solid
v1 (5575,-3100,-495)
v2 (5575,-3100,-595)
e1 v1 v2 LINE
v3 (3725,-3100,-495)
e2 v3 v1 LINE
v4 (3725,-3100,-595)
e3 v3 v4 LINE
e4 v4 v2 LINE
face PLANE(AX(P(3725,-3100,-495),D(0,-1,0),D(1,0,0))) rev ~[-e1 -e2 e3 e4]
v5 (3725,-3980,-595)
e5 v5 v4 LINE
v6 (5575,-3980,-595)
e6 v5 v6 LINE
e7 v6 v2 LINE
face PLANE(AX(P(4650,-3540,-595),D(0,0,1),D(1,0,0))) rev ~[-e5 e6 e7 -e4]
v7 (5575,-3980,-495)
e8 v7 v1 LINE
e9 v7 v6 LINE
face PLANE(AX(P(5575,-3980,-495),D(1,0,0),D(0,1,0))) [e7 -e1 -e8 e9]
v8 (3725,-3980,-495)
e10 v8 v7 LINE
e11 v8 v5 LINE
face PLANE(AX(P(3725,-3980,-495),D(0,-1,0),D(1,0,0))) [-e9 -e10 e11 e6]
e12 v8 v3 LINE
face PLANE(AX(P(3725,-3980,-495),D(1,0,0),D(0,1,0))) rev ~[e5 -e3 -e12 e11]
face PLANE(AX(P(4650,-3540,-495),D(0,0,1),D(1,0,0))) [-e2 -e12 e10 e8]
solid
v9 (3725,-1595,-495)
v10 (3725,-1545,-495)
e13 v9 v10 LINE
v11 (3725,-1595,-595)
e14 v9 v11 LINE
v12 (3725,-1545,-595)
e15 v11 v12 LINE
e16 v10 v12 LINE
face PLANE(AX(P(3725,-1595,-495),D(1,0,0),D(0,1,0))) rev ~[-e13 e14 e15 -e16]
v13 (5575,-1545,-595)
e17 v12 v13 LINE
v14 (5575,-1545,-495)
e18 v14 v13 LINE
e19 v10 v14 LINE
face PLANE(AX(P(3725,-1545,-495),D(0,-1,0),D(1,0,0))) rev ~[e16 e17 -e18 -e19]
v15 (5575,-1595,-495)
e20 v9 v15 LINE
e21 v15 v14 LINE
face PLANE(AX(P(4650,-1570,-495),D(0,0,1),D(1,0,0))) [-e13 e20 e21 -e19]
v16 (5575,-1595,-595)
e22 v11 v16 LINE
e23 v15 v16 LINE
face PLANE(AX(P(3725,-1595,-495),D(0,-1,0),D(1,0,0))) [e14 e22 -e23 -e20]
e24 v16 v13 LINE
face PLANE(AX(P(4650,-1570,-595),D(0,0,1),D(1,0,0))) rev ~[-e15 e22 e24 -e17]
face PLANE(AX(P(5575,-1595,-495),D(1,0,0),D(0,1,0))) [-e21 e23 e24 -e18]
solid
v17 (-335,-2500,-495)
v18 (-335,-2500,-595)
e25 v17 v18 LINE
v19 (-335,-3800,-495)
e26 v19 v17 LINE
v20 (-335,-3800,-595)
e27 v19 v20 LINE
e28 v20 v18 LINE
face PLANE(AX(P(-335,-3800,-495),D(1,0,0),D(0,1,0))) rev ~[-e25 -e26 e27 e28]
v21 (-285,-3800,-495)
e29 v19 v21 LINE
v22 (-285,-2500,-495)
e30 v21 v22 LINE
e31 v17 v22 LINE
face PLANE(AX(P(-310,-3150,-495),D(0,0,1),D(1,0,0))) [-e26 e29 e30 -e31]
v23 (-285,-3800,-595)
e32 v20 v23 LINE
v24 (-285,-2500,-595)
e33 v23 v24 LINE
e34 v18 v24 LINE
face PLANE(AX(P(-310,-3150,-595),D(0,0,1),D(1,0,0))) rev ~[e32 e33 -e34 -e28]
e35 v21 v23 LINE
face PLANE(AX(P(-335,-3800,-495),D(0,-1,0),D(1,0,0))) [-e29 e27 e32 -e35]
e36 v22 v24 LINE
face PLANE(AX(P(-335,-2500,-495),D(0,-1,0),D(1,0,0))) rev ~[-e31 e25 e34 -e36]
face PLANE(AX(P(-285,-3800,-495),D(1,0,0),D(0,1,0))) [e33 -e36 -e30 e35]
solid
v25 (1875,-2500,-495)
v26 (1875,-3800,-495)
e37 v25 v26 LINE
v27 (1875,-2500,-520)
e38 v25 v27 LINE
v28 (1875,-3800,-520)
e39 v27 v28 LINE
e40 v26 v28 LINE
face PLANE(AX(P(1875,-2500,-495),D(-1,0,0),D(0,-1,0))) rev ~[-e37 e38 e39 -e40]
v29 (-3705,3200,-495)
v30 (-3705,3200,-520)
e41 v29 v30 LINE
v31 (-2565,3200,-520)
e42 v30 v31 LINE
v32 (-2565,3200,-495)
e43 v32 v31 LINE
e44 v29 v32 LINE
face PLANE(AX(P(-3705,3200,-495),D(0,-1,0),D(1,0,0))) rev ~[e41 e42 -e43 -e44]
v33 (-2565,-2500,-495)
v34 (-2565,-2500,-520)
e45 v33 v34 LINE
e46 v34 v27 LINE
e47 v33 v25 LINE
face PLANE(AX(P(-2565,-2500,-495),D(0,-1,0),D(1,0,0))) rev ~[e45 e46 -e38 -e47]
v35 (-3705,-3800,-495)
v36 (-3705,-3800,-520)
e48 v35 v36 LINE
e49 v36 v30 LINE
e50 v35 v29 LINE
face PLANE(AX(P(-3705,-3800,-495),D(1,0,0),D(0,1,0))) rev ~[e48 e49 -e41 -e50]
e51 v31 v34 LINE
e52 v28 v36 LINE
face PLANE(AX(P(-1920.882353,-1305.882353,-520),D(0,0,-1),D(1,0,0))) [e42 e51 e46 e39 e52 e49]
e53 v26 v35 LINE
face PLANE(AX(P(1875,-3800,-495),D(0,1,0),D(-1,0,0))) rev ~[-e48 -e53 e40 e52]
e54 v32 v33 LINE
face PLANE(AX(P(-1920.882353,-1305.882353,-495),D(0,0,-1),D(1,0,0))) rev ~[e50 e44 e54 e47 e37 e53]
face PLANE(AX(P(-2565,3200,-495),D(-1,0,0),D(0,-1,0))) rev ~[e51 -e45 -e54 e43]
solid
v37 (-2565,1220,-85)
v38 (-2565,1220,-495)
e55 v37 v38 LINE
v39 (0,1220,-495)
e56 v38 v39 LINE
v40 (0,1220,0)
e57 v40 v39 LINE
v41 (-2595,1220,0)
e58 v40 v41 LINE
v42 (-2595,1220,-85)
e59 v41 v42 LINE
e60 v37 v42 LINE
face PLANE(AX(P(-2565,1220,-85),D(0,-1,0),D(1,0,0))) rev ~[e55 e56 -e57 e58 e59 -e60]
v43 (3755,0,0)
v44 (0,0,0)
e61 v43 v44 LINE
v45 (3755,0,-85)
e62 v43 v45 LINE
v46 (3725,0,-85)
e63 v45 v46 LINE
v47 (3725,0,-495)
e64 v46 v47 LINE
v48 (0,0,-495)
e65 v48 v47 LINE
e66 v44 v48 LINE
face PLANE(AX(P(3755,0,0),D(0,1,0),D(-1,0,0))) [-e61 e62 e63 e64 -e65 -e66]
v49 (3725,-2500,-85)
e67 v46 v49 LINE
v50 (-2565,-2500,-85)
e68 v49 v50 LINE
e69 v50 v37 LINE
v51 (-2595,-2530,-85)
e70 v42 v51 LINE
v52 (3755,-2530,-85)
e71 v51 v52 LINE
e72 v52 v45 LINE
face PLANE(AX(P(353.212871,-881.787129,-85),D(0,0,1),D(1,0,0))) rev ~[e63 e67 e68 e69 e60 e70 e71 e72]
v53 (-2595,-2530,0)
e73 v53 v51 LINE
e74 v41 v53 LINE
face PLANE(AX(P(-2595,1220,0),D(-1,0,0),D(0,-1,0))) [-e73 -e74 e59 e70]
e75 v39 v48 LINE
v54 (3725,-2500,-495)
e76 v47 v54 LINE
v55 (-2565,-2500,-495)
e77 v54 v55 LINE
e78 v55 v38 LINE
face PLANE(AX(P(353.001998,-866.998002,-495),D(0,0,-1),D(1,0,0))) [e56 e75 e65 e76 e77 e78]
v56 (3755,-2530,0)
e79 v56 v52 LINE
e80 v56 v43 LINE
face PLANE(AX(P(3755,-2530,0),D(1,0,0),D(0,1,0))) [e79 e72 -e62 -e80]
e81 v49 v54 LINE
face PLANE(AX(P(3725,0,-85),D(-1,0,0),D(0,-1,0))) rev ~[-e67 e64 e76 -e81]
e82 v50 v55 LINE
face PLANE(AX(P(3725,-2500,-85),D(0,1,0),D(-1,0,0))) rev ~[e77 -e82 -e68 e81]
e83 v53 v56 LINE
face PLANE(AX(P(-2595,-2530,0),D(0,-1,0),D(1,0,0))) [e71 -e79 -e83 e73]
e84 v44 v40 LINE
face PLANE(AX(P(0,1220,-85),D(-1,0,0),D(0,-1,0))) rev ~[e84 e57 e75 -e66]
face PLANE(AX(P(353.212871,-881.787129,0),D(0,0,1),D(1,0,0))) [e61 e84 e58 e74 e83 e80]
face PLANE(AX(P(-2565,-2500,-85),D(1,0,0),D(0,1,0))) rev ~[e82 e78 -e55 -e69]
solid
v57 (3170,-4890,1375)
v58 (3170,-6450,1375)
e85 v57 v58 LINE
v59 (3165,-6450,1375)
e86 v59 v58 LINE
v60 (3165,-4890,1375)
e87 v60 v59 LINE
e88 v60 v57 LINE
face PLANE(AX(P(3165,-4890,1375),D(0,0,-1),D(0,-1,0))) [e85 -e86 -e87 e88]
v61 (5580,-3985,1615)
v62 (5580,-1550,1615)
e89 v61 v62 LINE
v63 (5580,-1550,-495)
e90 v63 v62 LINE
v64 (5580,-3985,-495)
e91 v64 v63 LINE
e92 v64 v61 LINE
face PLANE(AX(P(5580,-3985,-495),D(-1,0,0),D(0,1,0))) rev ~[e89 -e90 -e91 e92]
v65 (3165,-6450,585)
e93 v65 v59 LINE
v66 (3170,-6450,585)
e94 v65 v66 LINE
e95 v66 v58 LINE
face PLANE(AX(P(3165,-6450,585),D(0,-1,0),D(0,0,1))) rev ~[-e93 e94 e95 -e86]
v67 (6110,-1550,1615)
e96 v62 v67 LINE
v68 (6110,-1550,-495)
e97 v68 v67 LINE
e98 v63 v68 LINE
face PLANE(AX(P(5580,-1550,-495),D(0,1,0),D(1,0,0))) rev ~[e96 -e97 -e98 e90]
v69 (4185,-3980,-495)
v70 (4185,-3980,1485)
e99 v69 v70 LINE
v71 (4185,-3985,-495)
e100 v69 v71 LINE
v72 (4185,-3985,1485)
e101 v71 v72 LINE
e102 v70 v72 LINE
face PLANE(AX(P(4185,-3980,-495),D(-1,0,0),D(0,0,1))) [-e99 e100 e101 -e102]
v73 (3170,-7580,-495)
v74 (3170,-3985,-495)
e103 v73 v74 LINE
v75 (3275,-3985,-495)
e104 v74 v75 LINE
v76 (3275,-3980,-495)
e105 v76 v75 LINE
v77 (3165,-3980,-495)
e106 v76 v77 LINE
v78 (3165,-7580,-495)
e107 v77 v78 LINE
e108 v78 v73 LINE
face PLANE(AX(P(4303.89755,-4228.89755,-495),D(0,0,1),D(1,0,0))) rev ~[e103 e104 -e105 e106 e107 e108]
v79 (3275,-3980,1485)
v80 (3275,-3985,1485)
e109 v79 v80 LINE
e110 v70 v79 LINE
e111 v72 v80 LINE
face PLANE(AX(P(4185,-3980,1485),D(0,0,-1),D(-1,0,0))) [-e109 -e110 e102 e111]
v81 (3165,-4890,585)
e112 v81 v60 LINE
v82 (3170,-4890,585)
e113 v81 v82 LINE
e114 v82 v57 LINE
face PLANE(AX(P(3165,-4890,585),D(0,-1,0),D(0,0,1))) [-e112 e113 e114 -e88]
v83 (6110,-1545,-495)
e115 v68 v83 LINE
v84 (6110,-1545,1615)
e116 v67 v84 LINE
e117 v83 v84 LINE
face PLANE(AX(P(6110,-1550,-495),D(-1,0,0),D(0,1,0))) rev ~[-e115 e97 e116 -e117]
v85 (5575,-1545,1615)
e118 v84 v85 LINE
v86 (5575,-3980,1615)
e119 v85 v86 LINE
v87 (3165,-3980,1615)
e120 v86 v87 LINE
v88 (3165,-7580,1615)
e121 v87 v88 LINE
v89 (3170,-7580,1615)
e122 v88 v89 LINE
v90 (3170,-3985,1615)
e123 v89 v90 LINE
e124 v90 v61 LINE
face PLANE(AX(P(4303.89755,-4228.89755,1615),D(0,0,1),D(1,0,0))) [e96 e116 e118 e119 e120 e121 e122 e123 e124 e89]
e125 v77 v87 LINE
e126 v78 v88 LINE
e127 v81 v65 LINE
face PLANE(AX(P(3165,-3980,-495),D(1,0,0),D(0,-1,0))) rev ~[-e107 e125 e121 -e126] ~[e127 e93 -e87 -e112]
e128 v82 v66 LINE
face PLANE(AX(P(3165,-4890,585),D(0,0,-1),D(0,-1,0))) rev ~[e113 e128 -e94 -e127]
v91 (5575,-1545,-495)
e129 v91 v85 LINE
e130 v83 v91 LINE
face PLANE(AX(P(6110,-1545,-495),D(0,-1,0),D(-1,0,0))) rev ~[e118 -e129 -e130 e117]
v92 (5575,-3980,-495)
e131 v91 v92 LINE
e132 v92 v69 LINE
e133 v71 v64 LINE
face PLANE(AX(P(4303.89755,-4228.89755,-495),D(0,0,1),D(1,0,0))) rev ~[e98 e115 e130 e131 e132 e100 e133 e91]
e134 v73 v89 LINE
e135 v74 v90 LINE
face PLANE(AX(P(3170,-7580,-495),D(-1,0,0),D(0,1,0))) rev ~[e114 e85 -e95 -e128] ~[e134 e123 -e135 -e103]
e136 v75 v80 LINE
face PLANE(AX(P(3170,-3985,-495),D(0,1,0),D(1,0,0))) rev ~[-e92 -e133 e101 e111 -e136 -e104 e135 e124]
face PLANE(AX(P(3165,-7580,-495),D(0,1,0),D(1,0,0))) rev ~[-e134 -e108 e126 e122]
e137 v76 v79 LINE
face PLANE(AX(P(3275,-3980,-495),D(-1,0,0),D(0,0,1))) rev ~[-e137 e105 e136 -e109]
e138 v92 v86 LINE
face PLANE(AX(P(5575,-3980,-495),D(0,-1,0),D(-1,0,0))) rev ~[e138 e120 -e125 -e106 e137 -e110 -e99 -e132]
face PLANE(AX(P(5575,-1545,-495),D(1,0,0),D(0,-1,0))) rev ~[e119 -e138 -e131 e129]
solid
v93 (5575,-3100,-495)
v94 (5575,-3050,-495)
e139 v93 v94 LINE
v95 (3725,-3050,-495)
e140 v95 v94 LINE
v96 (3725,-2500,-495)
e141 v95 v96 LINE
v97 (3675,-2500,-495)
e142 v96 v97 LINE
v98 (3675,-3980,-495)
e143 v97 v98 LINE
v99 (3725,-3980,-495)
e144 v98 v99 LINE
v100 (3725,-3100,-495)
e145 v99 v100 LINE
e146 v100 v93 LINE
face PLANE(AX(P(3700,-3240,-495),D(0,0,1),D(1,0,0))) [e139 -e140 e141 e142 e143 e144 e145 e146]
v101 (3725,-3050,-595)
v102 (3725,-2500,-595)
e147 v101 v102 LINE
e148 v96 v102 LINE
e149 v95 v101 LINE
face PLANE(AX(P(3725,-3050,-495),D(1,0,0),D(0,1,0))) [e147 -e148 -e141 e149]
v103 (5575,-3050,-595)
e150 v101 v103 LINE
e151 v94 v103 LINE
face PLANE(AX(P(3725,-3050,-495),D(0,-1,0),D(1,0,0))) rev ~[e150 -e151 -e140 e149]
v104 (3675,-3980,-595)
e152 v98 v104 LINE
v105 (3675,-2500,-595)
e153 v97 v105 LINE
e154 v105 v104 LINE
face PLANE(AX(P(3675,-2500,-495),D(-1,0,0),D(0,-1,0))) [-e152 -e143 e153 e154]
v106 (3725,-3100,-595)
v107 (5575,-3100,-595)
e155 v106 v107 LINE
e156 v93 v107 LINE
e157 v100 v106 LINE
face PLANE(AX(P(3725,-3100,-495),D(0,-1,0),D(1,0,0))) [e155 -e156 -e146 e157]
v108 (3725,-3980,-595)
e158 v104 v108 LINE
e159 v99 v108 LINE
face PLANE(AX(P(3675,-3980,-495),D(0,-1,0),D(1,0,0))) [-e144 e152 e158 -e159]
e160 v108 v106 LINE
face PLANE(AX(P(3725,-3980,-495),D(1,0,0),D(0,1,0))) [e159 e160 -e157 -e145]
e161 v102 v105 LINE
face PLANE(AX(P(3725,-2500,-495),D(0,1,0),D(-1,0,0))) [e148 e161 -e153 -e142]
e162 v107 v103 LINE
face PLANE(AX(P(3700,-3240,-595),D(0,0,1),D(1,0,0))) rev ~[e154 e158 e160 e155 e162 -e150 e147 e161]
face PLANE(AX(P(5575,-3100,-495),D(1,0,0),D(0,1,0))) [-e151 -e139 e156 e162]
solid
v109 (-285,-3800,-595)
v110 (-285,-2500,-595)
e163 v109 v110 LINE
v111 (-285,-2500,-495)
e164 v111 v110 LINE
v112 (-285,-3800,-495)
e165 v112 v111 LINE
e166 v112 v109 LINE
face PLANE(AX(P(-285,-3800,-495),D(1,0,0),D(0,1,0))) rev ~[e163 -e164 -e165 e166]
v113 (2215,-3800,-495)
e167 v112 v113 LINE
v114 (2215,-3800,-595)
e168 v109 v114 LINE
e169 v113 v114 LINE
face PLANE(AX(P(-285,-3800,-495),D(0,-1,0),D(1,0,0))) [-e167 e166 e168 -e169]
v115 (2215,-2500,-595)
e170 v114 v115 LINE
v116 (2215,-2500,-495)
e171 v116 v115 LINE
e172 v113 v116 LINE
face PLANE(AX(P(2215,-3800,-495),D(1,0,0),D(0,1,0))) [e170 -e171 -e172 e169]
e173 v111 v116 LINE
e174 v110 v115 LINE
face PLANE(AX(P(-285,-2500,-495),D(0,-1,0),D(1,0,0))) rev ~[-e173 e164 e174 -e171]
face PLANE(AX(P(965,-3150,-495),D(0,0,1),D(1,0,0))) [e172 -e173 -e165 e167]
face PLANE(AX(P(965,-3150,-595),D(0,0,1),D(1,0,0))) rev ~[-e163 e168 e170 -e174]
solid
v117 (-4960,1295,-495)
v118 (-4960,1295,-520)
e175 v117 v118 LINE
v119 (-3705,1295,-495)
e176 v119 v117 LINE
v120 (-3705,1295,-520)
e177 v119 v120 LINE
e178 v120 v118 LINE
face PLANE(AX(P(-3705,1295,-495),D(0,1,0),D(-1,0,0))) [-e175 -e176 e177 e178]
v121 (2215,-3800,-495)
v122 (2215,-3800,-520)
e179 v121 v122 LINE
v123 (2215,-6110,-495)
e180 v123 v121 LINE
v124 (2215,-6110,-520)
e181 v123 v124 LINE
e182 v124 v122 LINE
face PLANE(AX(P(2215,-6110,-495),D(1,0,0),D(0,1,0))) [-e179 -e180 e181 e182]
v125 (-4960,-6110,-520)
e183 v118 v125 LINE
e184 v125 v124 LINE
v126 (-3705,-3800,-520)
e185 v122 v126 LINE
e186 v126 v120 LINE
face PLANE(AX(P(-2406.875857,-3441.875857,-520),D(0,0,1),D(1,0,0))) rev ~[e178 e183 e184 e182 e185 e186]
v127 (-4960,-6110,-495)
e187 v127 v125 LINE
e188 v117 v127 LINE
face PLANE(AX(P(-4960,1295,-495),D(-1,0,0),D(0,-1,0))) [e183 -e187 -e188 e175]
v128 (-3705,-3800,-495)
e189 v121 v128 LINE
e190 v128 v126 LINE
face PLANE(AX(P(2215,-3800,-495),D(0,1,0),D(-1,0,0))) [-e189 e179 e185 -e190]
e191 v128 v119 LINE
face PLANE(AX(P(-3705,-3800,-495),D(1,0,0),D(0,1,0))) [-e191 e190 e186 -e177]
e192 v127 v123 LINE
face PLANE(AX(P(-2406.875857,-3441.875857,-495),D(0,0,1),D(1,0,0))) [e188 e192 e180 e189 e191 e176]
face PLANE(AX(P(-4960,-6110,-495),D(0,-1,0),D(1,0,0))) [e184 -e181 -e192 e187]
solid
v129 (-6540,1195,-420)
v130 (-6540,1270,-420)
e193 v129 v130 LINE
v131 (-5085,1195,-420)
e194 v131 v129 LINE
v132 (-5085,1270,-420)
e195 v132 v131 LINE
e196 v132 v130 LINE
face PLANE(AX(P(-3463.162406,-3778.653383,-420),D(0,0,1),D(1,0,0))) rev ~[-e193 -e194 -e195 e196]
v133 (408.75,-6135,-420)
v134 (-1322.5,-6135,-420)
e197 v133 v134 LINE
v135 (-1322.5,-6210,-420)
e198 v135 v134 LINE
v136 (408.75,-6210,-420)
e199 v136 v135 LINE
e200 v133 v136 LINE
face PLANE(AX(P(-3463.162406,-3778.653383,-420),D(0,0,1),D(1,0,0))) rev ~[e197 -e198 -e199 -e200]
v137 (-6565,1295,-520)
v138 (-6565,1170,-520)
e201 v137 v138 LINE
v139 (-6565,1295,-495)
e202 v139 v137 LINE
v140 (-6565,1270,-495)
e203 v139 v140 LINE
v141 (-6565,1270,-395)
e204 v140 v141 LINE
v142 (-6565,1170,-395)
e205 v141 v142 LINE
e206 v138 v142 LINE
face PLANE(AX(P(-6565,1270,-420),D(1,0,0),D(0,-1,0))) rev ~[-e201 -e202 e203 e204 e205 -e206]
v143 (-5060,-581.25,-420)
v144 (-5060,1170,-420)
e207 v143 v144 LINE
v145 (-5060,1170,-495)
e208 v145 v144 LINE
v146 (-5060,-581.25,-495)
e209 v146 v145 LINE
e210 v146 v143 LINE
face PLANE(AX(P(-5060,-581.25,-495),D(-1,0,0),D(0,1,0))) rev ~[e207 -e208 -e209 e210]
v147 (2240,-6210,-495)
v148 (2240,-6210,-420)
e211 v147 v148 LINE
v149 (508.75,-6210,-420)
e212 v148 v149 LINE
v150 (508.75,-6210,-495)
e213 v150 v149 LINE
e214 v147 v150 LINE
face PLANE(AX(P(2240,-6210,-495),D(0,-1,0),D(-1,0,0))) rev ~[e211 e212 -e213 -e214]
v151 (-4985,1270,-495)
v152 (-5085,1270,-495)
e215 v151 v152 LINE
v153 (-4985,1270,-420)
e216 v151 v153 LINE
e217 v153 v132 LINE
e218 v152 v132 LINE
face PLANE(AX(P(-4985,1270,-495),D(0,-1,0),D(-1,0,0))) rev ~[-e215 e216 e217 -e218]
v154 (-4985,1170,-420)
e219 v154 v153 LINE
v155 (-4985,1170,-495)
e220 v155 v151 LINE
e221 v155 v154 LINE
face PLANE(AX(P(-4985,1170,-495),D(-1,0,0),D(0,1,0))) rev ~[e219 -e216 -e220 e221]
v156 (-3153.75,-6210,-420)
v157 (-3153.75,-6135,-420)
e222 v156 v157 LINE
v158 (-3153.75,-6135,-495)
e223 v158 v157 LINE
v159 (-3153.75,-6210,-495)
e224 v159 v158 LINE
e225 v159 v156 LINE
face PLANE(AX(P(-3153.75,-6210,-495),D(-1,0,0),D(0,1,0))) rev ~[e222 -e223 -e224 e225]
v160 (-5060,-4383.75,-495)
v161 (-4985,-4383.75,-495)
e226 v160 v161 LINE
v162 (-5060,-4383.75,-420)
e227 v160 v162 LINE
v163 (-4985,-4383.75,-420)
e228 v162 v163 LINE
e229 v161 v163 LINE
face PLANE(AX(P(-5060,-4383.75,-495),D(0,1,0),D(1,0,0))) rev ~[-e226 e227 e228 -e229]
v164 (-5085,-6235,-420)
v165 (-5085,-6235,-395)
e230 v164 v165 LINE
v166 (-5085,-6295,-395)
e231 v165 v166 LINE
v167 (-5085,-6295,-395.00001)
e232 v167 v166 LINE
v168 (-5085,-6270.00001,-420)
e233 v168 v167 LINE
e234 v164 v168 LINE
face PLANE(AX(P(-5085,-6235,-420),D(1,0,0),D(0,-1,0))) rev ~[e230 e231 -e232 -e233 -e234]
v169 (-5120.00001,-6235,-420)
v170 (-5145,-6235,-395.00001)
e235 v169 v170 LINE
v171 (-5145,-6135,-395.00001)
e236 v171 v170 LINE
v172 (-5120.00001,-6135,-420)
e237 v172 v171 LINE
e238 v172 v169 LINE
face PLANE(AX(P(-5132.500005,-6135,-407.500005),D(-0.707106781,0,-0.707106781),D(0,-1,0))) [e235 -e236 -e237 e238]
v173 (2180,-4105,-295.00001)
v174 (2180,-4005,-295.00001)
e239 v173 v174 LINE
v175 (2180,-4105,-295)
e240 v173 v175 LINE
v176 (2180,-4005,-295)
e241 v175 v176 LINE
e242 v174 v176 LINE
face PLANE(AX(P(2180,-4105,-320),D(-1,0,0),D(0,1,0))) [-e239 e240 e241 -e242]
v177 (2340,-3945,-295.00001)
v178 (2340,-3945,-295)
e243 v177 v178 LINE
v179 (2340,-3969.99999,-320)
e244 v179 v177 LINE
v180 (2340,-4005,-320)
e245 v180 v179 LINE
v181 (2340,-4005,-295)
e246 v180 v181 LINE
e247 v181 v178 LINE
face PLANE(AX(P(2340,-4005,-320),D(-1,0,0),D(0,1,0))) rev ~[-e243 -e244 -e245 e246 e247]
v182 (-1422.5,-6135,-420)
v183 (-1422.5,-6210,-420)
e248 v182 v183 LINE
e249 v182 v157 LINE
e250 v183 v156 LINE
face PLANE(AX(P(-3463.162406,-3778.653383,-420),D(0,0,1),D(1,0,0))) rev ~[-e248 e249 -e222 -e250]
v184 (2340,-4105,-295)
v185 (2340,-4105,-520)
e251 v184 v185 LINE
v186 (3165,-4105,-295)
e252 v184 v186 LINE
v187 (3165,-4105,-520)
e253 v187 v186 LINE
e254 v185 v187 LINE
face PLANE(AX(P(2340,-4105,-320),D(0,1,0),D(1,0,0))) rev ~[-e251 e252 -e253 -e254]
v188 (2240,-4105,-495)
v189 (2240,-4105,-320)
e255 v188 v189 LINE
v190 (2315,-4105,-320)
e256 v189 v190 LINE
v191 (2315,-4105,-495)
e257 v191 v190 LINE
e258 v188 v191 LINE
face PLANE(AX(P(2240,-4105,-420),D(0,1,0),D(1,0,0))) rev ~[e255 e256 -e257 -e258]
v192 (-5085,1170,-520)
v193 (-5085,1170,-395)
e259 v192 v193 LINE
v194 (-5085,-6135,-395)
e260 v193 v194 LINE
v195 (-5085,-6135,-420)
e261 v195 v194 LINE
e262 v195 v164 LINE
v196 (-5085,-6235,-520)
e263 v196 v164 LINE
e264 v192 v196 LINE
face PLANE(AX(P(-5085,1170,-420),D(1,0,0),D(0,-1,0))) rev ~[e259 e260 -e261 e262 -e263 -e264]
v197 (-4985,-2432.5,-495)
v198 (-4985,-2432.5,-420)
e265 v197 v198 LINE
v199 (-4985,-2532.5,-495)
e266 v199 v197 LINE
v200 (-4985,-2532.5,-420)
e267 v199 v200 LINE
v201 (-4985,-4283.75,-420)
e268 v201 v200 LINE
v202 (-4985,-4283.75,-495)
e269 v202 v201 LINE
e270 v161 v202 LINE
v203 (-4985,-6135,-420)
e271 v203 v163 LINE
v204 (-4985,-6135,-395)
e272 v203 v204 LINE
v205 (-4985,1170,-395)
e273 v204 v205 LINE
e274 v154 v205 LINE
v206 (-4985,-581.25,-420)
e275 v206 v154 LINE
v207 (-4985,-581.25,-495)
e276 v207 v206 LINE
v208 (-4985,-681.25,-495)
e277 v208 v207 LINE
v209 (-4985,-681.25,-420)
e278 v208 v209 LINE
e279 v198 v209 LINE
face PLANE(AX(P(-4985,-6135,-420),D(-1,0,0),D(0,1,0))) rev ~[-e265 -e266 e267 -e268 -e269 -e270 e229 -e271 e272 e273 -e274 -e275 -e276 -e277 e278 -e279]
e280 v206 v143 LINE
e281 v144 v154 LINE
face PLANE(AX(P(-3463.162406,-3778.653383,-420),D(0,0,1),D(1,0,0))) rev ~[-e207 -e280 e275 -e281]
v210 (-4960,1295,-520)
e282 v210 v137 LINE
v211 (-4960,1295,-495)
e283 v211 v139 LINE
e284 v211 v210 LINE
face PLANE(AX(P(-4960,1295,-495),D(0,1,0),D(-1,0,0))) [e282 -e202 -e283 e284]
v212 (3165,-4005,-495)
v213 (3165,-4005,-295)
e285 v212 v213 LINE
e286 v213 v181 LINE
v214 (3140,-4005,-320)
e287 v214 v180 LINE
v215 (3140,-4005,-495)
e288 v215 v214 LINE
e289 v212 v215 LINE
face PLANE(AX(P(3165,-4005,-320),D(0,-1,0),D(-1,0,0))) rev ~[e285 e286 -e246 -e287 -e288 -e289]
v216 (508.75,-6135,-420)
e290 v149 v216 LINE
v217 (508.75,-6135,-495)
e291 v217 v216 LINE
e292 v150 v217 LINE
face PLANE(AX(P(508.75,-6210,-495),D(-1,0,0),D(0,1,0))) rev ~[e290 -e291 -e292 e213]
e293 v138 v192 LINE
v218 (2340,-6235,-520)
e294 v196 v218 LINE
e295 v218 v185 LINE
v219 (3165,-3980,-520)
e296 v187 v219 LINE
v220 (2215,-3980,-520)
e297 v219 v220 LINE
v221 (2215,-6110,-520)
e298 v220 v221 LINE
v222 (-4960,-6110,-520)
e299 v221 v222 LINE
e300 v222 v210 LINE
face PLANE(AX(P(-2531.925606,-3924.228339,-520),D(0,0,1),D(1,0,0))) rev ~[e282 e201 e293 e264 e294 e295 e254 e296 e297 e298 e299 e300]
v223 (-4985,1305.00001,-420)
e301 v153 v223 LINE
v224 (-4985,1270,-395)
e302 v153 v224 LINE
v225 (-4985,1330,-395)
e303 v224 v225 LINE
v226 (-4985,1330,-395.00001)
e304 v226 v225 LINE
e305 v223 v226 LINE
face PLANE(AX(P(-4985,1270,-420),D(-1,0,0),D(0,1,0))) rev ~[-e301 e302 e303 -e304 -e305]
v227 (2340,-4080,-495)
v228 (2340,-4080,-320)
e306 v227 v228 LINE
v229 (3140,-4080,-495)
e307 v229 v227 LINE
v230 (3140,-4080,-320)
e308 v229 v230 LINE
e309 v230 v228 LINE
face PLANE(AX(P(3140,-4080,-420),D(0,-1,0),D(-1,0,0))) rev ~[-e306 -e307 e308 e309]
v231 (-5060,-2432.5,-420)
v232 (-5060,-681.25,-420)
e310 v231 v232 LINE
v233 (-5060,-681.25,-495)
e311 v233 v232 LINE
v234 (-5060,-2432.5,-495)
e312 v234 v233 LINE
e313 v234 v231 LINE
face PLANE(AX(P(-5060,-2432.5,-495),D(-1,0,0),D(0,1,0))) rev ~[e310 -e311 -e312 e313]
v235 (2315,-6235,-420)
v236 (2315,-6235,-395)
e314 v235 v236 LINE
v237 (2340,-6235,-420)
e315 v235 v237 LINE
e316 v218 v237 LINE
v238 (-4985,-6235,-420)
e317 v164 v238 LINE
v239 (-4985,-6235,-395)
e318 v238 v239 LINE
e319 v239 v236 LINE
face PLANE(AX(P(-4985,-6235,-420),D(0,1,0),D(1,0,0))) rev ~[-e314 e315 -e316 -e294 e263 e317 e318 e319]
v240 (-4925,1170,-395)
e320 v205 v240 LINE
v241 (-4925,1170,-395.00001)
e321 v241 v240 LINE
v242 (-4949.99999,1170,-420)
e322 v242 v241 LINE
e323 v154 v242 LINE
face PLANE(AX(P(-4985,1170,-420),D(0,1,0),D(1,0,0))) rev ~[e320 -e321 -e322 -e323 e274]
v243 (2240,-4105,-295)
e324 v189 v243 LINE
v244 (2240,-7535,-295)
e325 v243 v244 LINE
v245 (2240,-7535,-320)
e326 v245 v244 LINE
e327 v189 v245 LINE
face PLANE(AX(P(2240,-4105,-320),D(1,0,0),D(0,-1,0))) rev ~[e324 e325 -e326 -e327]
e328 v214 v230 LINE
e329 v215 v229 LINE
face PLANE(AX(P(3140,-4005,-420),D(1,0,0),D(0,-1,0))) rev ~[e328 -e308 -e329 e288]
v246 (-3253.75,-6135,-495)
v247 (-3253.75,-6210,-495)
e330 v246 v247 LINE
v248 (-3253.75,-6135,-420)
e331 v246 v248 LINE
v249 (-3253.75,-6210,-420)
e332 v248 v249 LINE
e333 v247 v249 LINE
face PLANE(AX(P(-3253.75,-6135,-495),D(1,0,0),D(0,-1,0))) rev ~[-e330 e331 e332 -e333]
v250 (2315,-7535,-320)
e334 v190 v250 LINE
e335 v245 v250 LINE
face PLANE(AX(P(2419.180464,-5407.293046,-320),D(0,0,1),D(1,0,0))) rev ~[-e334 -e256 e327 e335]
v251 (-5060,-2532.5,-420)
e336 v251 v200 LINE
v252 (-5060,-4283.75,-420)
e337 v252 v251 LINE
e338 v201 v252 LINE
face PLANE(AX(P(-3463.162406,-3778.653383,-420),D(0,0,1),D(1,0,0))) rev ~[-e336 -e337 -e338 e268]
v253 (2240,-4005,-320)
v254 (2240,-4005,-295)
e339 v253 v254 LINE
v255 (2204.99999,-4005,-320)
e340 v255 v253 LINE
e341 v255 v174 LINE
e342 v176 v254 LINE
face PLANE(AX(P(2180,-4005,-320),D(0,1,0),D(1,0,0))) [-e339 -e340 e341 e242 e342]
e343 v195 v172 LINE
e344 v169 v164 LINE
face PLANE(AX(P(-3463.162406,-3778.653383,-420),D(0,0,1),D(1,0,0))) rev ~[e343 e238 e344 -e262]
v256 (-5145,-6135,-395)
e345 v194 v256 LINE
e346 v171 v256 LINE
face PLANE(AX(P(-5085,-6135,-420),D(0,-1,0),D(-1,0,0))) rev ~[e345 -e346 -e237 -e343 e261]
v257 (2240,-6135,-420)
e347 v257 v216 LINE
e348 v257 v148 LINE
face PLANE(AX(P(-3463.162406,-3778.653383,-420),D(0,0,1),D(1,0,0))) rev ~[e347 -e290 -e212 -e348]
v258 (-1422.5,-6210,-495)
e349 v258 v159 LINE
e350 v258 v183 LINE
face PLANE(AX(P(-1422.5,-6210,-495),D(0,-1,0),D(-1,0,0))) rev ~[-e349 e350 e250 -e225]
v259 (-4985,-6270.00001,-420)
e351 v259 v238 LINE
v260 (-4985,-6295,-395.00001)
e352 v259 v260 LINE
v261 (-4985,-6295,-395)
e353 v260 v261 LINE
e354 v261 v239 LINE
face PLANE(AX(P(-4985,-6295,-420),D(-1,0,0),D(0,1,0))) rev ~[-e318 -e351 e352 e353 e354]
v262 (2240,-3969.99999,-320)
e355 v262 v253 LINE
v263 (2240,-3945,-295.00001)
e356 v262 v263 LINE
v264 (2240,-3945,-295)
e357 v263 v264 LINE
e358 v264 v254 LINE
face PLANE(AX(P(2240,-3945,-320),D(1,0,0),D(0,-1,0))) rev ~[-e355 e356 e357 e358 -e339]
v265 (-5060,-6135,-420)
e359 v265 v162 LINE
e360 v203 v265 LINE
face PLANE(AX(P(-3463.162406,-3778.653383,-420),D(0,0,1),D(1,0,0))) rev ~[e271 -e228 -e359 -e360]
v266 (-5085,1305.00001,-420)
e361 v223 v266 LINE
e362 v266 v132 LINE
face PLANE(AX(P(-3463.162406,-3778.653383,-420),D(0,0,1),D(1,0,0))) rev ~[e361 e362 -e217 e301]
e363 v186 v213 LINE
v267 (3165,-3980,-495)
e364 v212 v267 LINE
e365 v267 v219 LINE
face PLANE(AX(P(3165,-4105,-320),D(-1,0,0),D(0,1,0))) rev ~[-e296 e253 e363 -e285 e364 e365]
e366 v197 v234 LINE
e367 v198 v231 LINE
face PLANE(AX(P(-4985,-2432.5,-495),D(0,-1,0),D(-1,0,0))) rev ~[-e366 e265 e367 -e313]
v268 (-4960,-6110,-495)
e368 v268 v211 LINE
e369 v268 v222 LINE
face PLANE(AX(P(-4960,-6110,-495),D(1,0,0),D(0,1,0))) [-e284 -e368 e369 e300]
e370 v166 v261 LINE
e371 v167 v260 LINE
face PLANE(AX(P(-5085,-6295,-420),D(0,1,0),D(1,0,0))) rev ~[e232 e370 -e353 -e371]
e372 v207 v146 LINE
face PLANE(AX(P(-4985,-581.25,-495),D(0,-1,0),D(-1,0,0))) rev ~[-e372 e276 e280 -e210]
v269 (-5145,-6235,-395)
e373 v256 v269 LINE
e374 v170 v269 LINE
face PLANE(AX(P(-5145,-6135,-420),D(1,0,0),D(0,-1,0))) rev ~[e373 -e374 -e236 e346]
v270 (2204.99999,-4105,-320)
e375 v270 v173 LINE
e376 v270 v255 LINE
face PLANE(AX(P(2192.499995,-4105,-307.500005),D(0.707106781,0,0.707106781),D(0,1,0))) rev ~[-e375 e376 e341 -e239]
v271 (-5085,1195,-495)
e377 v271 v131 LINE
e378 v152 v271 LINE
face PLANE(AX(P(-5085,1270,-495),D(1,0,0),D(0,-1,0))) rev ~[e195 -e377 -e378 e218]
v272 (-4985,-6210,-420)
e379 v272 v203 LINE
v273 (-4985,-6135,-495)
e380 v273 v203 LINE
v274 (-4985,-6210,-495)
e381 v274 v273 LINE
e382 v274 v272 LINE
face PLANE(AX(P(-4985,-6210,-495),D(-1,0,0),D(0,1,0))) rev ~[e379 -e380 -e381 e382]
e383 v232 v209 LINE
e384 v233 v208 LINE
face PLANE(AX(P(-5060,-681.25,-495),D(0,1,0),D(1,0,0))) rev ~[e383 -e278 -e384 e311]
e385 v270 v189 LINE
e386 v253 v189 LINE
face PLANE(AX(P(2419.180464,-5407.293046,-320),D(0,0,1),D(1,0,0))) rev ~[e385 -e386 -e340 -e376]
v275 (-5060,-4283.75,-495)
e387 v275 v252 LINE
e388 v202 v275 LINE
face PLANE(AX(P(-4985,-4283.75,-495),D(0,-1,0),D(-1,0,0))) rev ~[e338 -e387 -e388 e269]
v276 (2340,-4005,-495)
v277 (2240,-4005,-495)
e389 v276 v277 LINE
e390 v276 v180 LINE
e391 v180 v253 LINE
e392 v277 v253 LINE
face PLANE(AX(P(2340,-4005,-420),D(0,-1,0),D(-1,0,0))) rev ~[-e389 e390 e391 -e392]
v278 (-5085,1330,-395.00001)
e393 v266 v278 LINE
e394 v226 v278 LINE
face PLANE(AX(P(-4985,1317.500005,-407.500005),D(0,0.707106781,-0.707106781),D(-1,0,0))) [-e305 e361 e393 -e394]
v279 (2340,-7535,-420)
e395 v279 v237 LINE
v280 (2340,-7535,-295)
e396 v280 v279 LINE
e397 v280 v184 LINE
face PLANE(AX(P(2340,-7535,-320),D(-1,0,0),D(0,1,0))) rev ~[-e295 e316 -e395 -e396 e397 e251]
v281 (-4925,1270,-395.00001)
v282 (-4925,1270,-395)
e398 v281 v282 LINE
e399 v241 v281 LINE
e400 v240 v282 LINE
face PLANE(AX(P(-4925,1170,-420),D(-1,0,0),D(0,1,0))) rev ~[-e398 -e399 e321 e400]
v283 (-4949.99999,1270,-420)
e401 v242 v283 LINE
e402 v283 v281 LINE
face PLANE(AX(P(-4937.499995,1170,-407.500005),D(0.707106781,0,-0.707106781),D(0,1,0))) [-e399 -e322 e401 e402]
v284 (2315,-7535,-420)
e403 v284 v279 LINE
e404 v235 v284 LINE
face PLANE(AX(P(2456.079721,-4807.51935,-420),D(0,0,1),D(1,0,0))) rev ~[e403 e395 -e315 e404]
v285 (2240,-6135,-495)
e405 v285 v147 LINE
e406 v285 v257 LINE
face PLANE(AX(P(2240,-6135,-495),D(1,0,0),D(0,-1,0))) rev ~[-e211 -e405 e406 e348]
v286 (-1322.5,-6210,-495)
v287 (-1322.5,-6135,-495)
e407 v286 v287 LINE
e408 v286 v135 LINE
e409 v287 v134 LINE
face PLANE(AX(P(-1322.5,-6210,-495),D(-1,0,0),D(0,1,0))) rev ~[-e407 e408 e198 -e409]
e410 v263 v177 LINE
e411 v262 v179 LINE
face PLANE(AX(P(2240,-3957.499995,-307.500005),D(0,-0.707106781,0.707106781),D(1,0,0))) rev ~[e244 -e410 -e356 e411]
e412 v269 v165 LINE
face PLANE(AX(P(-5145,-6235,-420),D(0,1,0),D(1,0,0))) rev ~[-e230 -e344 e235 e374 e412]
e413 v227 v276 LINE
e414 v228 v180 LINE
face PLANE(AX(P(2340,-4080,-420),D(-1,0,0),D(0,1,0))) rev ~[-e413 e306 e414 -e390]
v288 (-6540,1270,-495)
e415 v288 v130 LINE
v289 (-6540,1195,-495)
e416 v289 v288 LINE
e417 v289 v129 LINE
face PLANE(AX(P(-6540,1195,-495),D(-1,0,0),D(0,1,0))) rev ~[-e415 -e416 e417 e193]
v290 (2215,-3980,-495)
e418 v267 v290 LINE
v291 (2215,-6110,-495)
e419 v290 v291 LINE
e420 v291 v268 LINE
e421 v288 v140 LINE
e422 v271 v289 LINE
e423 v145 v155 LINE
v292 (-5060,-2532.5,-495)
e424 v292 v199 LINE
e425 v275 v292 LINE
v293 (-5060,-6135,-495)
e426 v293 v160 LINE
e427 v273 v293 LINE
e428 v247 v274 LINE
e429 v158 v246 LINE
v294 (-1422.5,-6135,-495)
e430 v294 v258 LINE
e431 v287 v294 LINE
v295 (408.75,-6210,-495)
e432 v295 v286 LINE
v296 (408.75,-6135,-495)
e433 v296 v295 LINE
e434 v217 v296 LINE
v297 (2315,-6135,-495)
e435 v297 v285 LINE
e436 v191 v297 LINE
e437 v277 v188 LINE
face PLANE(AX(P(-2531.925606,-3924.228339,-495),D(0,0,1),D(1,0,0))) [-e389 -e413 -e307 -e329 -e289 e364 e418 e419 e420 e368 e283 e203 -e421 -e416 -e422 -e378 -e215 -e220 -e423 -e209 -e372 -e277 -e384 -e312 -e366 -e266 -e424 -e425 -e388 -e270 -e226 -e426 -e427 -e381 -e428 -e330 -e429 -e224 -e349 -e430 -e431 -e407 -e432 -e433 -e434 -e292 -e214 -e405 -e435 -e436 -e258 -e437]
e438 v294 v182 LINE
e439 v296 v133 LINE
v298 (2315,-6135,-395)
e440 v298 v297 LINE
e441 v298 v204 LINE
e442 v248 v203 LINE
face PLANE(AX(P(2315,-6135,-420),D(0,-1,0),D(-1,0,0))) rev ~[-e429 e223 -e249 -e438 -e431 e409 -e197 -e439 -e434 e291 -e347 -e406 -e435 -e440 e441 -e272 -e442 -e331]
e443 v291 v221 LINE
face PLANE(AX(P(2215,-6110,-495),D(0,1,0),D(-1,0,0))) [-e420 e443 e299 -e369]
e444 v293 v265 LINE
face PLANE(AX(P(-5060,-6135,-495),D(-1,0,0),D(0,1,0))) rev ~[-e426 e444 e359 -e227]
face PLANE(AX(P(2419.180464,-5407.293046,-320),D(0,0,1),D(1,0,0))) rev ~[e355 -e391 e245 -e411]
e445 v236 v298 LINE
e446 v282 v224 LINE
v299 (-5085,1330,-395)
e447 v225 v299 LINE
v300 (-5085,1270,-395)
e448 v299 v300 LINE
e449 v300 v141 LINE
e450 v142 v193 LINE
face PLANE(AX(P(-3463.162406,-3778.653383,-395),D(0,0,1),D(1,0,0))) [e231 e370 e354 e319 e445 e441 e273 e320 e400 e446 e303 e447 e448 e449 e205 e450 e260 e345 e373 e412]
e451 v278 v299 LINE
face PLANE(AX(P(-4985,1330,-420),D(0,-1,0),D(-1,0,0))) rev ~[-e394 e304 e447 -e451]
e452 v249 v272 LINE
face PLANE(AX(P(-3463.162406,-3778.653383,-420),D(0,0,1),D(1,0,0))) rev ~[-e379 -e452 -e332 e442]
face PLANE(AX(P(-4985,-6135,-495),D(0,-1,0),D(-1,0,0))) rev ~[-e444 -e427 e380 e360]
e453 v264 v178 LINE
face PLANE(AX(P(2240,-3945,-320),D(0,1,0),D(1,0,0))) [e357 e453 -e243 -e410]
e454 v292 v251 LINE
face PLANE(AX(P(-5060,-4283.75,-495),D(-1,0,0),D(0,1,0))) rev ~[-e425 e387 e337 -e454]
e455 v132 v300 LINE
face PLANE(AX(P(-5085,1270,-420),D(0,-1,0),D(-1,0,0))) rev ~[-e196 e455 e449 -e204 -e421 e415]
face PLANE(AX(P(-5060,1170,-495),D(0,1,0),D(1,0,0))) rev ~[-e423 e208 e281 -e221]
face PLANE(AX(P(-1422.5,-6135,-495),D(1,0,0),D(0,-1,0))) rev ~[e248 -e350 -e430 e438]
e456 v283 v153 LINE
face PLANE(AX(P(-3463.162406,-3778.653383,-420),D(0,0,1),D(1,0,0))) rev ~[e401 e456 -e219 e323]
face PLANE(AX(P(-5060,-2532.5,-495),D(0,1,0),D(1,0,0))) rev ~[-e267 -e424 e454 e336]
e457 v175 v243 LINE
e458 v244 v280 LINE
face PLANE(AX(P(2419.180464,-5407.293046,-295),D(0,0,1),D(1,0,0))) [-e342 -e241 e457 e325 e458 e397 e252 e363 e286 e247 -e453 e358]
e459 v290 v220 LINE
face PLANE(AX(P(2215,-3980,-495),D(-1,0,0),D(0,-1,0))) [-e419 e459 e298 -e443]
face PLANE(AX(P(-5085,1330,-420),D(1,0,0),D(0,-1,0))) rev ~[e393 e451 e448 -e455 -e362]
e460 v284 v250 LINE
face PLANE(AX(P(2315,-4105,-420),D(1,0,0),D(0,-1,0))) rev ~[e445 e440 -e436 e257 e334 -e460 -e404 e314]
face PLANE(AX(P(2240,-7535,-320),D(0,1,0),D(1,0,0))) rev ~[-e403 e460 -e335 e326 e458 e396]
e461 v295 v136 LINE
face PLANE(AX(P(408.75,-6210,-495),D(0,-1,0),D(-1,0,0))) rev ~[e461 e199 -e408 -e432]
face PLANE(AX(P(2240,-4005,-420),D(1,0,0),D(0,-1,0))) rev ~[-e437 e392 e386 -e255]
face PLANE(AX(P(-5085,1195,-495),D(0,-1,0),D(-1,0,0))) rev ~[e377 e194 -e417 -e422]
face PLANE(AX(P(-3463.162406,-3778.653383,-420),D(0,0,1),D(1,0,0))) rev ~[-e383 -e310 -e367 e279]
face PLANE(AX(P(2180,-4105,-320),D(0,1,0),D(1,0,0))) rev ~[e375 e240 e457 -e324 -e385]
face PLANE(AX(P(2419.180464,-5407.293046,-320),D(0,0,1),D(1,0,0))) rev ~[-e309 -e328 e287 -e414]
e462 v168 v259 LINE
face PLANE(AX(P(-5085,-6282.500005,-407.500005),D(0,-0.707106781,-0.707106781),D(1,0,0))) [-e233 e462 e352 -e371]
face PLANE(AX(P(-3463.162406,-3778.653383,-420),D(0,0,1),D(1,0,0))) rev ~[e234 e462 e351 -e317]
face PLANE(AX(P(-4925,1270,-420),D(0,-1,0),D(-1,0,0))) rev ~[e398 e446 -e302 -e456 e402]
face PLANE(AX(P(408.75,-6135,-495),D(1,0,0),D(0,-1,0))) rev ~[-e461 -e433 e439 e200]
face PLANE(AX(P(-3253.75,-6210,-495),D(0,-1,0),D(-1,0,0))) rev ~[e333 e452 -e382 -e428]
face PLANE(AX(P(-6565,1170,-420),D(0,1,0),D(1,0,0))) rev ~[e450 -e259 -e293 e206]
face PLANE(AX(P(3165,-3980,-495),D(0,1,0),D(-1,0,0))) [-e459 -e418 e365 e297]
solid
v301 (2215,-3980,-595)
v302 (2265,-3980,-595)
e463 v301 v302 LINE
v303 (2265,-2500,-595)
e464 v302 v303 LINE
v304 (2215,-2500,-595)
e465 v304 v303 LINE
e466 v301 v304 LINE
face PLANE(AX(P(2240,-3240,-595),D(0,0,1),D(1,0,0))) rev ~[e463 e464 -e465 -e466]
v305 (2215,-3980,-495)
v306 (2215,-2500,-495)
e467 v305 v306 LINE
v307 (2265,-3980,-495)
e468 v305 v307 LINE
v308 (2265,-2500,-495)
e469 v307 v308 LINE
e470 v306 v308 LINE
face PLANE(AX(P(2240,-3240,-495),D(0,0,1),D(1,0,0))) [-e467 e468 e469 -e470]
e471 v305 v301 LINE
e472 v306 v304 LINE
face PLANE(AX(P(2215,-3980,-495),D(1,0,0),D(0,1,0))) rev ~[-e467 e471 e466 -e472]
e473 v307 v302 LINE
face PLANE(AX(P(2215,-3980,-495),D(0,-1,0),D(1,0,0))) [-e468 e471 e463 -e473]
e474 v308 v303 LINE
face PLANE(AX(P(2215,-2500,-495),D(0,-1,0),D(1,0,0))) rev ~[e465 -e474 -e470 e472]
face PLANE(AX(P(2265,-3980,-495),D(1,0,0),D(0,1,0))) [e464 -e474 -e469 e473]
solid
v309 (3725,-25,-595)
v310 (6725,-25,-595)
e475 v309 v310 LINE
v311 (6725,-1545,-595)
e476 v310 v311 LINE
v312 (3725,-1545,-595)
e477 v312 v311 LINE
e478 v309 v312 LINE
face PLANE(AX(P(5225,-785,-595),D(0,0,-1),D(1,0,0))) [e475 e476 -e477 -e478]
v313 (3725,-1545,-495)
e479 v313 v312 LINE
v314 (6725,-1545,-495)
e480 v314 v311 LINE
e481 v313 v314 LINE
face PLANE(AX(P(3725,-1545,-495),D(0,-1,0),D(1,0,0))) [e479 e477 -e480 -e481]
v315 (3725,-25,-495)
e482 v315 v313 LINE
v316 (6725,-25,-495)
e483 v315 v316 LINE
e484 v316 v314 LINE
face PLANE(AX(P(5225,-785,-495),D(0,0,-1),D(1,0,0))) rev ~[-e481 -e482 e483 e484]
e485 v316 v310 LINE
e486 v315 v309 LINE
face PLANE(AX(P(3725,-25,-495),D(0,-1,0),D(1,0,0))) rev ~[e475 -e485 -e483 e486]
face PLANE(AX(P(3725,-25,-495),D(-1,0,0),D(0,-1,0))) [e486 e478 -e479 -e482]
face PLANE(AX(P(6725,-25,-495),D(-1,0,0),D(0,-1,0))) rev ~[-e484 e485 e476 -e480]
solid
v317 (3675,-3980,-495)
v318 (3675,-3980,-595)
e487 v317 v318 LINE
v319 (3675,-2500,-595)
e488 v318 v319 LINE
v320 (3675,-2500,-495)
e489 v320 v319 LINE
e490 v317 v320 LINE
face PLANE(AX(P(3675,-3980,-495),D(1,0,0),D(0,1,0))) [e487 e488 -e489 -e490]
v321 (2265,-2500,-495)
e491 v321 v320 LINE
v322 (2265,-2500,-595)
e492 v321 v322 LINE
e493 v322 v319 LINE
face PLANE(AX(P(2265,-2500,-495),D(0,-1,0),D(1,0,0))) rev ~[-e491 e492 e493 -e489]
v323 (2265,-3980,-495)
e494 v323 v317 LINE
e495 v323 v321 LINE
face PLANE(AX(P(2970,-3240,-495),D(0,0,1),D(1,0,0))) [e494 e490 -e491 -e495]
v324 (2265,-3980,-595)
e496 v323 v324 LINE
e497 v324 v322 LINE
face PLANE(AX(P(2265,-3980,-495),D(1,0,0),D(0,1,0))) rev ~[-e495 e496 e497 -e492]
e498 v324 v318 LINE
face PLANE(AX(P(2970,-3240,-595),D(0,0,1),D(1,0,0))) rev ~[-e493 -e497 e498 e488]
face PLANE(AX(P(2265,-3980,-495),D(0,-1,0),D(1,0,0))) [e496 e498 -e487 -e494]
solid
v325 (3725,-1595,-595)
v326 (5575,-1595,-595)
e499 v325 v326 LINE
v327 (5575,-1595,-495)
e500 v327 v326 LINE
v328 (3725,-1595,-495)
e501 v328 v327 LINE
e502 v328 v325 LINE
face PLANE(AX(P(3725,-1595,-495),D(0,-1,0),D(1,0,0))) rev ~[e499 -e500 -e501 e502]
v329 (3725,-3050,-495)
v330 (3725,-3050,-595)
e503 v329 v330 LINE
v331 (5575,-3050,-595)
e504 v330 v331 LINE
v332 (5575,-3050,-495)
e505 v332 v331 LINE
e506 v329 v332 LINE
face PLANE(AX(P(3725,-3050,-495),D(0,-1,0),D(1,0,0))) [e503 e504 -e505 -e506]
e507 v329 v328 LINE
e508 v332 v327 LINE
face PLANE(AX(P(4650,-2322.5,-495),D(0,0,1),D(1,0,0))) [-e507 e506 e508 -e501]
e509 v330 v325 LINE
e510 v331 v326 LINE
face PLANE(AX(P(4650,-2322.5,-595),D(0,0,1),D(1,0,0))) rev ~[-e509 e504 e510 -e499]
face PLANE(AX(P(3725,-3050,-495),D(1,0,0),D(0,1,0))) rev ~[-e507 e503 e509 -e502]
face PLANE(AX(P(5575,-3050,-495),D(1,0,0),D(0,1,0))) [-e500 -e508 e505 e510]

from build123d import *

# Parameters (mm, degrees)
F1_DEPTH  = 85
F3_DEPTH  = 410
F5_DEPTH  = 25
F7_DEPTH  = 25
F9_DEPTH  = 75
F10_W     = 25
F10_H     = 1300
F11_DEPTH = 100
F12_W     = 800
F12_H     = 75
F12_W_2   = 100
F12_H_2   = 60
F12_W_3   = 75
F12_H_3   = 3430
F12_W_4   = 60
F12_H_4   = 100
F13_DEPTH = 25
F15_DEPTH = 25
F16_SIZE  = 24.99999
F18_DEPTH = 25
F20_DEPTH = 2110
F21_W     = 3000
F21_H     = 1520
F22_DEPTH = 100
F23_W     = 50
F23_H     = 1480
F24_DEPTH = 100
F23_W_2   = 1850
F23_H_2   = 50
F23_H_3   = 1300
F25_W     = 1850
F25_H     = 1455
F26_DEPTH = 100
F25_H_2   = 880
F25_W_2   = 1410
F25_H_3   = 1480
F25_W_3   = 2500
F25_H_4   = 1300
F27_W     = 910
F27_H     = 1980
F28_DEPTH = 5
F29_W     = 1560
F29_H     = 790
F30_DEPTH = 5


# Not quite as in the source:
# - a fillet or chamfer is up to 0.001 mm smaller than in the source, because OpenCascade refuses the exact size


with BuildPart() as f1:
    # F0 (on Top) → F1 (new body)
    with BuildSketch(Plane.XY):
        Polygon((3755, 0), (0, 0), (0, 1220), (-2595, 1220), (-2595, -2530), (3755, -2530), align=None)
    extrude(amount=-F1_DEPTH)

    # F2 (on face) → F3 (join)
    with BuildSketch(Plane(origin=(0, 0, -85), x_dir=(1, 0, 0), z_dir=(0, 0, -1))):
        Polygon((-2565, 2500), (-2565, -1220), (0, -1220), (0, 0), (3725, 0), (3725, 2500), align=None)
    extrude(amount=F3_DEPTH)


with BuildPart() as f5:
    # F4 (on face) → F5 (new body)
    with BuildSketch(Plane(origin=(0, 0, -495), x_dir=(1, 0, 0), z_dir=(0, 0, -1))):
        Polygon((-2565, -3200), (-2565, 2500), (1875, 2500), (1875, 3800), (-3705, 3800), (-3705, -3200), align=None)
    extrude(amount=F5_DEPTH)


with BuildPart() as f7:
    # F6 (on face) → F7 (new body)
    with BuildSketch(Plane.XY.offset(-495)):
        Polygon((3165, -3980), (2215, -3980), (2215, -6110), (-4960, -6110), (-4960, 1295), (-6565, 1295), (-6565, 1170), (-5085, 1170), (-5085, -6235), (2340, -6235), (2340, -4105), (3165, -4105), align=None)
    extrude(amount=-F7_DEPTH)

    # F8 (on face) → F9 (join)
    with BuildSketch(Plane.XY.offset(-495)):
        Polygon((3165, -4005), (3140, -4005), (3140, -4080), (2340, -4080), (2340, -4005), (2240, -4005), (2240, -4105), (2315, -4105), (2315, -6135), (2240, -6135), (2240, -6210), (508.75, -6210), (508.75, -6135), (408.75, -6135), (408.75, -6210), (-1322.5, -6210), (-1322.5, -6135), (-1422.5, -6135), (-1422.5, -6210), (-3153.75, -6210), (-3153.75, -6135), (-3253.75, -6135), (-3253.75, -6210), (-4985, -6210), (-4985, -6135), (-5060, -6135), (-5060, -4383.75), (-4985, -4383.75), (-4985, -4283.75), (-5060, -4283.75), (-5060, -2532.5), (-4985, -2532.5), (-4985, -2432.5), (-5060, -2432.5), (-5060, -681.25), (-4985, -681.25), (-4985, -581.25), (-5060, -581.25), (-5060, 1170), (-4985, 1170), (-4985, 1270), (-5085, 1270), (-5085, 1195), (-6540, 1195), (-6540, 1270), (-6565, 1270), (-6565, 1170), (-5085, 1170), (-5085, -6235), (2340, -6235), (2340, -4105), (3165, -4105), align=None)
    extrude(amount=F9_DEPTH)

    # F10 (on face) → F11 (join)
    with BuildSketch(Plane.XY.offset(-420)):
        Polygon((3165, -4105), (3165, -4005), (3140, -4005), (3140, -4080), (2340, -4080), (2340, -4005), (2240, -4005), (2240, -4105), (2315, -4105), (2315, -6135), (2315, -6235), (2340, -6235), (2340, -4105), align=None)
        with Locations((2327.5, -6885)):
            Rectangle(F10_W, F10_H)
    extrude(amount=F11_DEPTH)

    # F12 (on face) → F13 (join)
    with BuildSketch(Plane.XY.offset(-320)):
        Polygon((2340, -4105), (3165, -4105), (3165, -4005), (3140, -4005), (3140, -4080), (2340, -4080), (2340, -4005), (2240, -4005), (2240, -4105), (2315, -4105), (2315, -7535), (2340, -7535), align=None)
        with Locations((2740, -4042.5)):
            Rectangle(F12_W, F12_H)
        with Locations((2290, -3975)):
            Rectangle(F12_W_2, F12_H_2)
        with Locations((2277.5, -5820)):
            Rectangle(F12_W_3, F12_H_3)
        with Locations((2210, -4055)):
            Rectangle(F12_W_4, F12_H_4)
    extrude(amount=F13_DEPTH)

    # F14 (on face) → F15 (join)
    with BuildSketch(Plane.XY.offset(-420)):
        Polygon((2315, -6235), (2315, -6135), (-4985, -6135), (-4985, 1170), (-4925, 1170), (-4925, 1270), (-4985, 1270), (-4985, 1330), (-5085, 1330), (-5085, 1270), (-6565, 1270), (-6565, 1170), (-5085, 1170), (-5085, -6135), (-5145, -6135), (-5145, -6235), (-5085, -6235), (-5085, -6295), (-4985, -6295), (-4985, -6235), align=None)
    extrude(amount=F15_DEPTH)

    # F16 (size 25 in the source; OpenCascade refuses exactly that, so slightly less here)
    f16_edges = [f7.edges().sort_by_distance(p)[0] for p in [
        (2180, -4055, -320),
        (2290, -3945, -320),
        (-5035, -6295, -420),
        (-5145, -6185, -420),
        (-5035, 1330, -420),
        (-4925, 1220, -420),
    ]]
    chamfer(f16_edges, length=F16_SIZE)


with BuildPart() as f18:
    # F17 (on face) → F18 (new body)
    with BuildSketch(Plane.XY.offset(-495)):
        Polygon((-3705, -3800), (-3705, 1295), (-4960, 1295), (-4960, -6110), (2215, -6110), (2215, -3800), (1875, -3800), align=None)
    extrude(amount=-F18_DEPTH)


with BuildPart() as f20:
    # F19 (on face) → F20 (new body)
    with BuildSketch(Plane.XY.offset(-495)):
        Polygon((3165, -3980), (3165, -7580), (3170, -7580), (3170, -3985), (5580, -3985), (5580, -1550), (6110, -1550), (6110, -1545), (5575, -1545), (5575, -3980), align=None)
    extrude(amount=F20_DEPTH)

    # F27 (on face) → F28 (cut, through all)
    with BuildSketch(Plane(origin=(0, -3980, 0), x_dir=(-1, 0, 0), z_dir=(0, 1, 0))):
        with Locations((-3730, 495)):
            Rectangle(F27_W, F27_H)
    extrude(amount=-F28_DEPTH, mode=Mode.SUBTRACT)

    # F29 (on face) → F30 (cut, through all)
    with BuildSketch(Plane(origin=(3165, 0, 0), x_dir=(0, -1, 0), z_dir=(-1, 0, 0))):
        with Locations((5670, 980)):
            Rectangle(F29_W, F29_H)
    extrude(amount=-F30_DEPTH, mode=Mode.SUBTRACT)


with BuildPart() as f22:
    # F21 (on face) → F22 (new body)
    with BuildSketch(Plane(origin=(0, 0, -495), x_dir=(1, 0, 0), z_dir=(0, 0, -1))):
        with Locations((5225, 785)):
            Rectangle(F21_W, F21_H)
    extrude(amount=F22_DEPTH)


with BuildPart() as f24:
    # F23 (on face) → F24 (new body)
    with BuildSketch(Plane.XY.offset(-495)):
        with Locations((2240, -3240)):
            Rectangle(F23_W, F23_H)
    extrude(amount=-F24_DEPTH)


with BuildPart() as f24b:
    # F23 (on face) → F24, piece 2 (new body)
    with BuildSketch(Plane.XY.offset(-495)):
        with Locations((4650, -1570)):
            Rectangle(F23_W_2, F23_H_2)
    extrude(amount=-F24_DEPTH)


with BuildPart() as f24c:
    # F23 (on face) → F24, piece 3 (new body)
    with BuildSketch(Plane.XY.offset(-495)):
        Polygon((3725, -3050), (3725, -2500), (3675, -2500), (3675, -3980), (3725, -3980), (3725, -3100), align=None)
        with Locations((4650, -3075)):
            Rectangle(F23_W_2, F23_H_2)
    extrude(amount=-F24_DEPTH)


with BuildPart() as f24d:
    # F23 (on face) → F24, piece 4 (new body)
    with BuildSketch(Plane.XY.offset(-495)):
        with Locations((-310, -3150)):
            Rectangle(F23_W, F23_H_3)
    extrude(amount=-F24_DEPTH)


with BuildPart() as f26:
    # F25 (on face) → F26 (new body)
    with BuildSketch(Plane.XY.offset(-495)):
        with Locations((4650, -2322.5)):
            Rectangle(F25_W, F25_H)
    extrude(amount=-F26_DEPTH)


with BuildPart() as f26b:
    # F25 (on face) → F26, piece 2 (new body)
    with BuildSketch(Plane.XY.offset(-495)):
        with Locations((4650, -3540)):
            Rectangle(F25_W, F25_H_2)
    extrude(amount=-F26_DEPTH)


with BuildPart() as f26c:
    # F25 (on face) → F26, piece 3 (new body)
    with BuildSketch(Plane.XY.offset(-495)):
        with Locations((2970, -3240)):
            Rectangle(F25_W_2, F25_H_3)
    extrude(amount=-F26_DEPTH)


with BuildPart() as f26d:
    # F25 (on face) → F26, piece 4 (new body)
    with BuildSketch(Plane.XY.offset(-495)):
        with Locations((965, -3150)):
            Rectangle(F25_W_3, F25_H_4)
    extrude(amount=-F26_DEPTH)


solid = Compound([f1.part, f5.part, f7.part, f18.part, f20.part, f22.part, f24.part, f24b.part, f24c.part, f24d.part, f26.part, f26b.part, f26c.part, f26d.part])
